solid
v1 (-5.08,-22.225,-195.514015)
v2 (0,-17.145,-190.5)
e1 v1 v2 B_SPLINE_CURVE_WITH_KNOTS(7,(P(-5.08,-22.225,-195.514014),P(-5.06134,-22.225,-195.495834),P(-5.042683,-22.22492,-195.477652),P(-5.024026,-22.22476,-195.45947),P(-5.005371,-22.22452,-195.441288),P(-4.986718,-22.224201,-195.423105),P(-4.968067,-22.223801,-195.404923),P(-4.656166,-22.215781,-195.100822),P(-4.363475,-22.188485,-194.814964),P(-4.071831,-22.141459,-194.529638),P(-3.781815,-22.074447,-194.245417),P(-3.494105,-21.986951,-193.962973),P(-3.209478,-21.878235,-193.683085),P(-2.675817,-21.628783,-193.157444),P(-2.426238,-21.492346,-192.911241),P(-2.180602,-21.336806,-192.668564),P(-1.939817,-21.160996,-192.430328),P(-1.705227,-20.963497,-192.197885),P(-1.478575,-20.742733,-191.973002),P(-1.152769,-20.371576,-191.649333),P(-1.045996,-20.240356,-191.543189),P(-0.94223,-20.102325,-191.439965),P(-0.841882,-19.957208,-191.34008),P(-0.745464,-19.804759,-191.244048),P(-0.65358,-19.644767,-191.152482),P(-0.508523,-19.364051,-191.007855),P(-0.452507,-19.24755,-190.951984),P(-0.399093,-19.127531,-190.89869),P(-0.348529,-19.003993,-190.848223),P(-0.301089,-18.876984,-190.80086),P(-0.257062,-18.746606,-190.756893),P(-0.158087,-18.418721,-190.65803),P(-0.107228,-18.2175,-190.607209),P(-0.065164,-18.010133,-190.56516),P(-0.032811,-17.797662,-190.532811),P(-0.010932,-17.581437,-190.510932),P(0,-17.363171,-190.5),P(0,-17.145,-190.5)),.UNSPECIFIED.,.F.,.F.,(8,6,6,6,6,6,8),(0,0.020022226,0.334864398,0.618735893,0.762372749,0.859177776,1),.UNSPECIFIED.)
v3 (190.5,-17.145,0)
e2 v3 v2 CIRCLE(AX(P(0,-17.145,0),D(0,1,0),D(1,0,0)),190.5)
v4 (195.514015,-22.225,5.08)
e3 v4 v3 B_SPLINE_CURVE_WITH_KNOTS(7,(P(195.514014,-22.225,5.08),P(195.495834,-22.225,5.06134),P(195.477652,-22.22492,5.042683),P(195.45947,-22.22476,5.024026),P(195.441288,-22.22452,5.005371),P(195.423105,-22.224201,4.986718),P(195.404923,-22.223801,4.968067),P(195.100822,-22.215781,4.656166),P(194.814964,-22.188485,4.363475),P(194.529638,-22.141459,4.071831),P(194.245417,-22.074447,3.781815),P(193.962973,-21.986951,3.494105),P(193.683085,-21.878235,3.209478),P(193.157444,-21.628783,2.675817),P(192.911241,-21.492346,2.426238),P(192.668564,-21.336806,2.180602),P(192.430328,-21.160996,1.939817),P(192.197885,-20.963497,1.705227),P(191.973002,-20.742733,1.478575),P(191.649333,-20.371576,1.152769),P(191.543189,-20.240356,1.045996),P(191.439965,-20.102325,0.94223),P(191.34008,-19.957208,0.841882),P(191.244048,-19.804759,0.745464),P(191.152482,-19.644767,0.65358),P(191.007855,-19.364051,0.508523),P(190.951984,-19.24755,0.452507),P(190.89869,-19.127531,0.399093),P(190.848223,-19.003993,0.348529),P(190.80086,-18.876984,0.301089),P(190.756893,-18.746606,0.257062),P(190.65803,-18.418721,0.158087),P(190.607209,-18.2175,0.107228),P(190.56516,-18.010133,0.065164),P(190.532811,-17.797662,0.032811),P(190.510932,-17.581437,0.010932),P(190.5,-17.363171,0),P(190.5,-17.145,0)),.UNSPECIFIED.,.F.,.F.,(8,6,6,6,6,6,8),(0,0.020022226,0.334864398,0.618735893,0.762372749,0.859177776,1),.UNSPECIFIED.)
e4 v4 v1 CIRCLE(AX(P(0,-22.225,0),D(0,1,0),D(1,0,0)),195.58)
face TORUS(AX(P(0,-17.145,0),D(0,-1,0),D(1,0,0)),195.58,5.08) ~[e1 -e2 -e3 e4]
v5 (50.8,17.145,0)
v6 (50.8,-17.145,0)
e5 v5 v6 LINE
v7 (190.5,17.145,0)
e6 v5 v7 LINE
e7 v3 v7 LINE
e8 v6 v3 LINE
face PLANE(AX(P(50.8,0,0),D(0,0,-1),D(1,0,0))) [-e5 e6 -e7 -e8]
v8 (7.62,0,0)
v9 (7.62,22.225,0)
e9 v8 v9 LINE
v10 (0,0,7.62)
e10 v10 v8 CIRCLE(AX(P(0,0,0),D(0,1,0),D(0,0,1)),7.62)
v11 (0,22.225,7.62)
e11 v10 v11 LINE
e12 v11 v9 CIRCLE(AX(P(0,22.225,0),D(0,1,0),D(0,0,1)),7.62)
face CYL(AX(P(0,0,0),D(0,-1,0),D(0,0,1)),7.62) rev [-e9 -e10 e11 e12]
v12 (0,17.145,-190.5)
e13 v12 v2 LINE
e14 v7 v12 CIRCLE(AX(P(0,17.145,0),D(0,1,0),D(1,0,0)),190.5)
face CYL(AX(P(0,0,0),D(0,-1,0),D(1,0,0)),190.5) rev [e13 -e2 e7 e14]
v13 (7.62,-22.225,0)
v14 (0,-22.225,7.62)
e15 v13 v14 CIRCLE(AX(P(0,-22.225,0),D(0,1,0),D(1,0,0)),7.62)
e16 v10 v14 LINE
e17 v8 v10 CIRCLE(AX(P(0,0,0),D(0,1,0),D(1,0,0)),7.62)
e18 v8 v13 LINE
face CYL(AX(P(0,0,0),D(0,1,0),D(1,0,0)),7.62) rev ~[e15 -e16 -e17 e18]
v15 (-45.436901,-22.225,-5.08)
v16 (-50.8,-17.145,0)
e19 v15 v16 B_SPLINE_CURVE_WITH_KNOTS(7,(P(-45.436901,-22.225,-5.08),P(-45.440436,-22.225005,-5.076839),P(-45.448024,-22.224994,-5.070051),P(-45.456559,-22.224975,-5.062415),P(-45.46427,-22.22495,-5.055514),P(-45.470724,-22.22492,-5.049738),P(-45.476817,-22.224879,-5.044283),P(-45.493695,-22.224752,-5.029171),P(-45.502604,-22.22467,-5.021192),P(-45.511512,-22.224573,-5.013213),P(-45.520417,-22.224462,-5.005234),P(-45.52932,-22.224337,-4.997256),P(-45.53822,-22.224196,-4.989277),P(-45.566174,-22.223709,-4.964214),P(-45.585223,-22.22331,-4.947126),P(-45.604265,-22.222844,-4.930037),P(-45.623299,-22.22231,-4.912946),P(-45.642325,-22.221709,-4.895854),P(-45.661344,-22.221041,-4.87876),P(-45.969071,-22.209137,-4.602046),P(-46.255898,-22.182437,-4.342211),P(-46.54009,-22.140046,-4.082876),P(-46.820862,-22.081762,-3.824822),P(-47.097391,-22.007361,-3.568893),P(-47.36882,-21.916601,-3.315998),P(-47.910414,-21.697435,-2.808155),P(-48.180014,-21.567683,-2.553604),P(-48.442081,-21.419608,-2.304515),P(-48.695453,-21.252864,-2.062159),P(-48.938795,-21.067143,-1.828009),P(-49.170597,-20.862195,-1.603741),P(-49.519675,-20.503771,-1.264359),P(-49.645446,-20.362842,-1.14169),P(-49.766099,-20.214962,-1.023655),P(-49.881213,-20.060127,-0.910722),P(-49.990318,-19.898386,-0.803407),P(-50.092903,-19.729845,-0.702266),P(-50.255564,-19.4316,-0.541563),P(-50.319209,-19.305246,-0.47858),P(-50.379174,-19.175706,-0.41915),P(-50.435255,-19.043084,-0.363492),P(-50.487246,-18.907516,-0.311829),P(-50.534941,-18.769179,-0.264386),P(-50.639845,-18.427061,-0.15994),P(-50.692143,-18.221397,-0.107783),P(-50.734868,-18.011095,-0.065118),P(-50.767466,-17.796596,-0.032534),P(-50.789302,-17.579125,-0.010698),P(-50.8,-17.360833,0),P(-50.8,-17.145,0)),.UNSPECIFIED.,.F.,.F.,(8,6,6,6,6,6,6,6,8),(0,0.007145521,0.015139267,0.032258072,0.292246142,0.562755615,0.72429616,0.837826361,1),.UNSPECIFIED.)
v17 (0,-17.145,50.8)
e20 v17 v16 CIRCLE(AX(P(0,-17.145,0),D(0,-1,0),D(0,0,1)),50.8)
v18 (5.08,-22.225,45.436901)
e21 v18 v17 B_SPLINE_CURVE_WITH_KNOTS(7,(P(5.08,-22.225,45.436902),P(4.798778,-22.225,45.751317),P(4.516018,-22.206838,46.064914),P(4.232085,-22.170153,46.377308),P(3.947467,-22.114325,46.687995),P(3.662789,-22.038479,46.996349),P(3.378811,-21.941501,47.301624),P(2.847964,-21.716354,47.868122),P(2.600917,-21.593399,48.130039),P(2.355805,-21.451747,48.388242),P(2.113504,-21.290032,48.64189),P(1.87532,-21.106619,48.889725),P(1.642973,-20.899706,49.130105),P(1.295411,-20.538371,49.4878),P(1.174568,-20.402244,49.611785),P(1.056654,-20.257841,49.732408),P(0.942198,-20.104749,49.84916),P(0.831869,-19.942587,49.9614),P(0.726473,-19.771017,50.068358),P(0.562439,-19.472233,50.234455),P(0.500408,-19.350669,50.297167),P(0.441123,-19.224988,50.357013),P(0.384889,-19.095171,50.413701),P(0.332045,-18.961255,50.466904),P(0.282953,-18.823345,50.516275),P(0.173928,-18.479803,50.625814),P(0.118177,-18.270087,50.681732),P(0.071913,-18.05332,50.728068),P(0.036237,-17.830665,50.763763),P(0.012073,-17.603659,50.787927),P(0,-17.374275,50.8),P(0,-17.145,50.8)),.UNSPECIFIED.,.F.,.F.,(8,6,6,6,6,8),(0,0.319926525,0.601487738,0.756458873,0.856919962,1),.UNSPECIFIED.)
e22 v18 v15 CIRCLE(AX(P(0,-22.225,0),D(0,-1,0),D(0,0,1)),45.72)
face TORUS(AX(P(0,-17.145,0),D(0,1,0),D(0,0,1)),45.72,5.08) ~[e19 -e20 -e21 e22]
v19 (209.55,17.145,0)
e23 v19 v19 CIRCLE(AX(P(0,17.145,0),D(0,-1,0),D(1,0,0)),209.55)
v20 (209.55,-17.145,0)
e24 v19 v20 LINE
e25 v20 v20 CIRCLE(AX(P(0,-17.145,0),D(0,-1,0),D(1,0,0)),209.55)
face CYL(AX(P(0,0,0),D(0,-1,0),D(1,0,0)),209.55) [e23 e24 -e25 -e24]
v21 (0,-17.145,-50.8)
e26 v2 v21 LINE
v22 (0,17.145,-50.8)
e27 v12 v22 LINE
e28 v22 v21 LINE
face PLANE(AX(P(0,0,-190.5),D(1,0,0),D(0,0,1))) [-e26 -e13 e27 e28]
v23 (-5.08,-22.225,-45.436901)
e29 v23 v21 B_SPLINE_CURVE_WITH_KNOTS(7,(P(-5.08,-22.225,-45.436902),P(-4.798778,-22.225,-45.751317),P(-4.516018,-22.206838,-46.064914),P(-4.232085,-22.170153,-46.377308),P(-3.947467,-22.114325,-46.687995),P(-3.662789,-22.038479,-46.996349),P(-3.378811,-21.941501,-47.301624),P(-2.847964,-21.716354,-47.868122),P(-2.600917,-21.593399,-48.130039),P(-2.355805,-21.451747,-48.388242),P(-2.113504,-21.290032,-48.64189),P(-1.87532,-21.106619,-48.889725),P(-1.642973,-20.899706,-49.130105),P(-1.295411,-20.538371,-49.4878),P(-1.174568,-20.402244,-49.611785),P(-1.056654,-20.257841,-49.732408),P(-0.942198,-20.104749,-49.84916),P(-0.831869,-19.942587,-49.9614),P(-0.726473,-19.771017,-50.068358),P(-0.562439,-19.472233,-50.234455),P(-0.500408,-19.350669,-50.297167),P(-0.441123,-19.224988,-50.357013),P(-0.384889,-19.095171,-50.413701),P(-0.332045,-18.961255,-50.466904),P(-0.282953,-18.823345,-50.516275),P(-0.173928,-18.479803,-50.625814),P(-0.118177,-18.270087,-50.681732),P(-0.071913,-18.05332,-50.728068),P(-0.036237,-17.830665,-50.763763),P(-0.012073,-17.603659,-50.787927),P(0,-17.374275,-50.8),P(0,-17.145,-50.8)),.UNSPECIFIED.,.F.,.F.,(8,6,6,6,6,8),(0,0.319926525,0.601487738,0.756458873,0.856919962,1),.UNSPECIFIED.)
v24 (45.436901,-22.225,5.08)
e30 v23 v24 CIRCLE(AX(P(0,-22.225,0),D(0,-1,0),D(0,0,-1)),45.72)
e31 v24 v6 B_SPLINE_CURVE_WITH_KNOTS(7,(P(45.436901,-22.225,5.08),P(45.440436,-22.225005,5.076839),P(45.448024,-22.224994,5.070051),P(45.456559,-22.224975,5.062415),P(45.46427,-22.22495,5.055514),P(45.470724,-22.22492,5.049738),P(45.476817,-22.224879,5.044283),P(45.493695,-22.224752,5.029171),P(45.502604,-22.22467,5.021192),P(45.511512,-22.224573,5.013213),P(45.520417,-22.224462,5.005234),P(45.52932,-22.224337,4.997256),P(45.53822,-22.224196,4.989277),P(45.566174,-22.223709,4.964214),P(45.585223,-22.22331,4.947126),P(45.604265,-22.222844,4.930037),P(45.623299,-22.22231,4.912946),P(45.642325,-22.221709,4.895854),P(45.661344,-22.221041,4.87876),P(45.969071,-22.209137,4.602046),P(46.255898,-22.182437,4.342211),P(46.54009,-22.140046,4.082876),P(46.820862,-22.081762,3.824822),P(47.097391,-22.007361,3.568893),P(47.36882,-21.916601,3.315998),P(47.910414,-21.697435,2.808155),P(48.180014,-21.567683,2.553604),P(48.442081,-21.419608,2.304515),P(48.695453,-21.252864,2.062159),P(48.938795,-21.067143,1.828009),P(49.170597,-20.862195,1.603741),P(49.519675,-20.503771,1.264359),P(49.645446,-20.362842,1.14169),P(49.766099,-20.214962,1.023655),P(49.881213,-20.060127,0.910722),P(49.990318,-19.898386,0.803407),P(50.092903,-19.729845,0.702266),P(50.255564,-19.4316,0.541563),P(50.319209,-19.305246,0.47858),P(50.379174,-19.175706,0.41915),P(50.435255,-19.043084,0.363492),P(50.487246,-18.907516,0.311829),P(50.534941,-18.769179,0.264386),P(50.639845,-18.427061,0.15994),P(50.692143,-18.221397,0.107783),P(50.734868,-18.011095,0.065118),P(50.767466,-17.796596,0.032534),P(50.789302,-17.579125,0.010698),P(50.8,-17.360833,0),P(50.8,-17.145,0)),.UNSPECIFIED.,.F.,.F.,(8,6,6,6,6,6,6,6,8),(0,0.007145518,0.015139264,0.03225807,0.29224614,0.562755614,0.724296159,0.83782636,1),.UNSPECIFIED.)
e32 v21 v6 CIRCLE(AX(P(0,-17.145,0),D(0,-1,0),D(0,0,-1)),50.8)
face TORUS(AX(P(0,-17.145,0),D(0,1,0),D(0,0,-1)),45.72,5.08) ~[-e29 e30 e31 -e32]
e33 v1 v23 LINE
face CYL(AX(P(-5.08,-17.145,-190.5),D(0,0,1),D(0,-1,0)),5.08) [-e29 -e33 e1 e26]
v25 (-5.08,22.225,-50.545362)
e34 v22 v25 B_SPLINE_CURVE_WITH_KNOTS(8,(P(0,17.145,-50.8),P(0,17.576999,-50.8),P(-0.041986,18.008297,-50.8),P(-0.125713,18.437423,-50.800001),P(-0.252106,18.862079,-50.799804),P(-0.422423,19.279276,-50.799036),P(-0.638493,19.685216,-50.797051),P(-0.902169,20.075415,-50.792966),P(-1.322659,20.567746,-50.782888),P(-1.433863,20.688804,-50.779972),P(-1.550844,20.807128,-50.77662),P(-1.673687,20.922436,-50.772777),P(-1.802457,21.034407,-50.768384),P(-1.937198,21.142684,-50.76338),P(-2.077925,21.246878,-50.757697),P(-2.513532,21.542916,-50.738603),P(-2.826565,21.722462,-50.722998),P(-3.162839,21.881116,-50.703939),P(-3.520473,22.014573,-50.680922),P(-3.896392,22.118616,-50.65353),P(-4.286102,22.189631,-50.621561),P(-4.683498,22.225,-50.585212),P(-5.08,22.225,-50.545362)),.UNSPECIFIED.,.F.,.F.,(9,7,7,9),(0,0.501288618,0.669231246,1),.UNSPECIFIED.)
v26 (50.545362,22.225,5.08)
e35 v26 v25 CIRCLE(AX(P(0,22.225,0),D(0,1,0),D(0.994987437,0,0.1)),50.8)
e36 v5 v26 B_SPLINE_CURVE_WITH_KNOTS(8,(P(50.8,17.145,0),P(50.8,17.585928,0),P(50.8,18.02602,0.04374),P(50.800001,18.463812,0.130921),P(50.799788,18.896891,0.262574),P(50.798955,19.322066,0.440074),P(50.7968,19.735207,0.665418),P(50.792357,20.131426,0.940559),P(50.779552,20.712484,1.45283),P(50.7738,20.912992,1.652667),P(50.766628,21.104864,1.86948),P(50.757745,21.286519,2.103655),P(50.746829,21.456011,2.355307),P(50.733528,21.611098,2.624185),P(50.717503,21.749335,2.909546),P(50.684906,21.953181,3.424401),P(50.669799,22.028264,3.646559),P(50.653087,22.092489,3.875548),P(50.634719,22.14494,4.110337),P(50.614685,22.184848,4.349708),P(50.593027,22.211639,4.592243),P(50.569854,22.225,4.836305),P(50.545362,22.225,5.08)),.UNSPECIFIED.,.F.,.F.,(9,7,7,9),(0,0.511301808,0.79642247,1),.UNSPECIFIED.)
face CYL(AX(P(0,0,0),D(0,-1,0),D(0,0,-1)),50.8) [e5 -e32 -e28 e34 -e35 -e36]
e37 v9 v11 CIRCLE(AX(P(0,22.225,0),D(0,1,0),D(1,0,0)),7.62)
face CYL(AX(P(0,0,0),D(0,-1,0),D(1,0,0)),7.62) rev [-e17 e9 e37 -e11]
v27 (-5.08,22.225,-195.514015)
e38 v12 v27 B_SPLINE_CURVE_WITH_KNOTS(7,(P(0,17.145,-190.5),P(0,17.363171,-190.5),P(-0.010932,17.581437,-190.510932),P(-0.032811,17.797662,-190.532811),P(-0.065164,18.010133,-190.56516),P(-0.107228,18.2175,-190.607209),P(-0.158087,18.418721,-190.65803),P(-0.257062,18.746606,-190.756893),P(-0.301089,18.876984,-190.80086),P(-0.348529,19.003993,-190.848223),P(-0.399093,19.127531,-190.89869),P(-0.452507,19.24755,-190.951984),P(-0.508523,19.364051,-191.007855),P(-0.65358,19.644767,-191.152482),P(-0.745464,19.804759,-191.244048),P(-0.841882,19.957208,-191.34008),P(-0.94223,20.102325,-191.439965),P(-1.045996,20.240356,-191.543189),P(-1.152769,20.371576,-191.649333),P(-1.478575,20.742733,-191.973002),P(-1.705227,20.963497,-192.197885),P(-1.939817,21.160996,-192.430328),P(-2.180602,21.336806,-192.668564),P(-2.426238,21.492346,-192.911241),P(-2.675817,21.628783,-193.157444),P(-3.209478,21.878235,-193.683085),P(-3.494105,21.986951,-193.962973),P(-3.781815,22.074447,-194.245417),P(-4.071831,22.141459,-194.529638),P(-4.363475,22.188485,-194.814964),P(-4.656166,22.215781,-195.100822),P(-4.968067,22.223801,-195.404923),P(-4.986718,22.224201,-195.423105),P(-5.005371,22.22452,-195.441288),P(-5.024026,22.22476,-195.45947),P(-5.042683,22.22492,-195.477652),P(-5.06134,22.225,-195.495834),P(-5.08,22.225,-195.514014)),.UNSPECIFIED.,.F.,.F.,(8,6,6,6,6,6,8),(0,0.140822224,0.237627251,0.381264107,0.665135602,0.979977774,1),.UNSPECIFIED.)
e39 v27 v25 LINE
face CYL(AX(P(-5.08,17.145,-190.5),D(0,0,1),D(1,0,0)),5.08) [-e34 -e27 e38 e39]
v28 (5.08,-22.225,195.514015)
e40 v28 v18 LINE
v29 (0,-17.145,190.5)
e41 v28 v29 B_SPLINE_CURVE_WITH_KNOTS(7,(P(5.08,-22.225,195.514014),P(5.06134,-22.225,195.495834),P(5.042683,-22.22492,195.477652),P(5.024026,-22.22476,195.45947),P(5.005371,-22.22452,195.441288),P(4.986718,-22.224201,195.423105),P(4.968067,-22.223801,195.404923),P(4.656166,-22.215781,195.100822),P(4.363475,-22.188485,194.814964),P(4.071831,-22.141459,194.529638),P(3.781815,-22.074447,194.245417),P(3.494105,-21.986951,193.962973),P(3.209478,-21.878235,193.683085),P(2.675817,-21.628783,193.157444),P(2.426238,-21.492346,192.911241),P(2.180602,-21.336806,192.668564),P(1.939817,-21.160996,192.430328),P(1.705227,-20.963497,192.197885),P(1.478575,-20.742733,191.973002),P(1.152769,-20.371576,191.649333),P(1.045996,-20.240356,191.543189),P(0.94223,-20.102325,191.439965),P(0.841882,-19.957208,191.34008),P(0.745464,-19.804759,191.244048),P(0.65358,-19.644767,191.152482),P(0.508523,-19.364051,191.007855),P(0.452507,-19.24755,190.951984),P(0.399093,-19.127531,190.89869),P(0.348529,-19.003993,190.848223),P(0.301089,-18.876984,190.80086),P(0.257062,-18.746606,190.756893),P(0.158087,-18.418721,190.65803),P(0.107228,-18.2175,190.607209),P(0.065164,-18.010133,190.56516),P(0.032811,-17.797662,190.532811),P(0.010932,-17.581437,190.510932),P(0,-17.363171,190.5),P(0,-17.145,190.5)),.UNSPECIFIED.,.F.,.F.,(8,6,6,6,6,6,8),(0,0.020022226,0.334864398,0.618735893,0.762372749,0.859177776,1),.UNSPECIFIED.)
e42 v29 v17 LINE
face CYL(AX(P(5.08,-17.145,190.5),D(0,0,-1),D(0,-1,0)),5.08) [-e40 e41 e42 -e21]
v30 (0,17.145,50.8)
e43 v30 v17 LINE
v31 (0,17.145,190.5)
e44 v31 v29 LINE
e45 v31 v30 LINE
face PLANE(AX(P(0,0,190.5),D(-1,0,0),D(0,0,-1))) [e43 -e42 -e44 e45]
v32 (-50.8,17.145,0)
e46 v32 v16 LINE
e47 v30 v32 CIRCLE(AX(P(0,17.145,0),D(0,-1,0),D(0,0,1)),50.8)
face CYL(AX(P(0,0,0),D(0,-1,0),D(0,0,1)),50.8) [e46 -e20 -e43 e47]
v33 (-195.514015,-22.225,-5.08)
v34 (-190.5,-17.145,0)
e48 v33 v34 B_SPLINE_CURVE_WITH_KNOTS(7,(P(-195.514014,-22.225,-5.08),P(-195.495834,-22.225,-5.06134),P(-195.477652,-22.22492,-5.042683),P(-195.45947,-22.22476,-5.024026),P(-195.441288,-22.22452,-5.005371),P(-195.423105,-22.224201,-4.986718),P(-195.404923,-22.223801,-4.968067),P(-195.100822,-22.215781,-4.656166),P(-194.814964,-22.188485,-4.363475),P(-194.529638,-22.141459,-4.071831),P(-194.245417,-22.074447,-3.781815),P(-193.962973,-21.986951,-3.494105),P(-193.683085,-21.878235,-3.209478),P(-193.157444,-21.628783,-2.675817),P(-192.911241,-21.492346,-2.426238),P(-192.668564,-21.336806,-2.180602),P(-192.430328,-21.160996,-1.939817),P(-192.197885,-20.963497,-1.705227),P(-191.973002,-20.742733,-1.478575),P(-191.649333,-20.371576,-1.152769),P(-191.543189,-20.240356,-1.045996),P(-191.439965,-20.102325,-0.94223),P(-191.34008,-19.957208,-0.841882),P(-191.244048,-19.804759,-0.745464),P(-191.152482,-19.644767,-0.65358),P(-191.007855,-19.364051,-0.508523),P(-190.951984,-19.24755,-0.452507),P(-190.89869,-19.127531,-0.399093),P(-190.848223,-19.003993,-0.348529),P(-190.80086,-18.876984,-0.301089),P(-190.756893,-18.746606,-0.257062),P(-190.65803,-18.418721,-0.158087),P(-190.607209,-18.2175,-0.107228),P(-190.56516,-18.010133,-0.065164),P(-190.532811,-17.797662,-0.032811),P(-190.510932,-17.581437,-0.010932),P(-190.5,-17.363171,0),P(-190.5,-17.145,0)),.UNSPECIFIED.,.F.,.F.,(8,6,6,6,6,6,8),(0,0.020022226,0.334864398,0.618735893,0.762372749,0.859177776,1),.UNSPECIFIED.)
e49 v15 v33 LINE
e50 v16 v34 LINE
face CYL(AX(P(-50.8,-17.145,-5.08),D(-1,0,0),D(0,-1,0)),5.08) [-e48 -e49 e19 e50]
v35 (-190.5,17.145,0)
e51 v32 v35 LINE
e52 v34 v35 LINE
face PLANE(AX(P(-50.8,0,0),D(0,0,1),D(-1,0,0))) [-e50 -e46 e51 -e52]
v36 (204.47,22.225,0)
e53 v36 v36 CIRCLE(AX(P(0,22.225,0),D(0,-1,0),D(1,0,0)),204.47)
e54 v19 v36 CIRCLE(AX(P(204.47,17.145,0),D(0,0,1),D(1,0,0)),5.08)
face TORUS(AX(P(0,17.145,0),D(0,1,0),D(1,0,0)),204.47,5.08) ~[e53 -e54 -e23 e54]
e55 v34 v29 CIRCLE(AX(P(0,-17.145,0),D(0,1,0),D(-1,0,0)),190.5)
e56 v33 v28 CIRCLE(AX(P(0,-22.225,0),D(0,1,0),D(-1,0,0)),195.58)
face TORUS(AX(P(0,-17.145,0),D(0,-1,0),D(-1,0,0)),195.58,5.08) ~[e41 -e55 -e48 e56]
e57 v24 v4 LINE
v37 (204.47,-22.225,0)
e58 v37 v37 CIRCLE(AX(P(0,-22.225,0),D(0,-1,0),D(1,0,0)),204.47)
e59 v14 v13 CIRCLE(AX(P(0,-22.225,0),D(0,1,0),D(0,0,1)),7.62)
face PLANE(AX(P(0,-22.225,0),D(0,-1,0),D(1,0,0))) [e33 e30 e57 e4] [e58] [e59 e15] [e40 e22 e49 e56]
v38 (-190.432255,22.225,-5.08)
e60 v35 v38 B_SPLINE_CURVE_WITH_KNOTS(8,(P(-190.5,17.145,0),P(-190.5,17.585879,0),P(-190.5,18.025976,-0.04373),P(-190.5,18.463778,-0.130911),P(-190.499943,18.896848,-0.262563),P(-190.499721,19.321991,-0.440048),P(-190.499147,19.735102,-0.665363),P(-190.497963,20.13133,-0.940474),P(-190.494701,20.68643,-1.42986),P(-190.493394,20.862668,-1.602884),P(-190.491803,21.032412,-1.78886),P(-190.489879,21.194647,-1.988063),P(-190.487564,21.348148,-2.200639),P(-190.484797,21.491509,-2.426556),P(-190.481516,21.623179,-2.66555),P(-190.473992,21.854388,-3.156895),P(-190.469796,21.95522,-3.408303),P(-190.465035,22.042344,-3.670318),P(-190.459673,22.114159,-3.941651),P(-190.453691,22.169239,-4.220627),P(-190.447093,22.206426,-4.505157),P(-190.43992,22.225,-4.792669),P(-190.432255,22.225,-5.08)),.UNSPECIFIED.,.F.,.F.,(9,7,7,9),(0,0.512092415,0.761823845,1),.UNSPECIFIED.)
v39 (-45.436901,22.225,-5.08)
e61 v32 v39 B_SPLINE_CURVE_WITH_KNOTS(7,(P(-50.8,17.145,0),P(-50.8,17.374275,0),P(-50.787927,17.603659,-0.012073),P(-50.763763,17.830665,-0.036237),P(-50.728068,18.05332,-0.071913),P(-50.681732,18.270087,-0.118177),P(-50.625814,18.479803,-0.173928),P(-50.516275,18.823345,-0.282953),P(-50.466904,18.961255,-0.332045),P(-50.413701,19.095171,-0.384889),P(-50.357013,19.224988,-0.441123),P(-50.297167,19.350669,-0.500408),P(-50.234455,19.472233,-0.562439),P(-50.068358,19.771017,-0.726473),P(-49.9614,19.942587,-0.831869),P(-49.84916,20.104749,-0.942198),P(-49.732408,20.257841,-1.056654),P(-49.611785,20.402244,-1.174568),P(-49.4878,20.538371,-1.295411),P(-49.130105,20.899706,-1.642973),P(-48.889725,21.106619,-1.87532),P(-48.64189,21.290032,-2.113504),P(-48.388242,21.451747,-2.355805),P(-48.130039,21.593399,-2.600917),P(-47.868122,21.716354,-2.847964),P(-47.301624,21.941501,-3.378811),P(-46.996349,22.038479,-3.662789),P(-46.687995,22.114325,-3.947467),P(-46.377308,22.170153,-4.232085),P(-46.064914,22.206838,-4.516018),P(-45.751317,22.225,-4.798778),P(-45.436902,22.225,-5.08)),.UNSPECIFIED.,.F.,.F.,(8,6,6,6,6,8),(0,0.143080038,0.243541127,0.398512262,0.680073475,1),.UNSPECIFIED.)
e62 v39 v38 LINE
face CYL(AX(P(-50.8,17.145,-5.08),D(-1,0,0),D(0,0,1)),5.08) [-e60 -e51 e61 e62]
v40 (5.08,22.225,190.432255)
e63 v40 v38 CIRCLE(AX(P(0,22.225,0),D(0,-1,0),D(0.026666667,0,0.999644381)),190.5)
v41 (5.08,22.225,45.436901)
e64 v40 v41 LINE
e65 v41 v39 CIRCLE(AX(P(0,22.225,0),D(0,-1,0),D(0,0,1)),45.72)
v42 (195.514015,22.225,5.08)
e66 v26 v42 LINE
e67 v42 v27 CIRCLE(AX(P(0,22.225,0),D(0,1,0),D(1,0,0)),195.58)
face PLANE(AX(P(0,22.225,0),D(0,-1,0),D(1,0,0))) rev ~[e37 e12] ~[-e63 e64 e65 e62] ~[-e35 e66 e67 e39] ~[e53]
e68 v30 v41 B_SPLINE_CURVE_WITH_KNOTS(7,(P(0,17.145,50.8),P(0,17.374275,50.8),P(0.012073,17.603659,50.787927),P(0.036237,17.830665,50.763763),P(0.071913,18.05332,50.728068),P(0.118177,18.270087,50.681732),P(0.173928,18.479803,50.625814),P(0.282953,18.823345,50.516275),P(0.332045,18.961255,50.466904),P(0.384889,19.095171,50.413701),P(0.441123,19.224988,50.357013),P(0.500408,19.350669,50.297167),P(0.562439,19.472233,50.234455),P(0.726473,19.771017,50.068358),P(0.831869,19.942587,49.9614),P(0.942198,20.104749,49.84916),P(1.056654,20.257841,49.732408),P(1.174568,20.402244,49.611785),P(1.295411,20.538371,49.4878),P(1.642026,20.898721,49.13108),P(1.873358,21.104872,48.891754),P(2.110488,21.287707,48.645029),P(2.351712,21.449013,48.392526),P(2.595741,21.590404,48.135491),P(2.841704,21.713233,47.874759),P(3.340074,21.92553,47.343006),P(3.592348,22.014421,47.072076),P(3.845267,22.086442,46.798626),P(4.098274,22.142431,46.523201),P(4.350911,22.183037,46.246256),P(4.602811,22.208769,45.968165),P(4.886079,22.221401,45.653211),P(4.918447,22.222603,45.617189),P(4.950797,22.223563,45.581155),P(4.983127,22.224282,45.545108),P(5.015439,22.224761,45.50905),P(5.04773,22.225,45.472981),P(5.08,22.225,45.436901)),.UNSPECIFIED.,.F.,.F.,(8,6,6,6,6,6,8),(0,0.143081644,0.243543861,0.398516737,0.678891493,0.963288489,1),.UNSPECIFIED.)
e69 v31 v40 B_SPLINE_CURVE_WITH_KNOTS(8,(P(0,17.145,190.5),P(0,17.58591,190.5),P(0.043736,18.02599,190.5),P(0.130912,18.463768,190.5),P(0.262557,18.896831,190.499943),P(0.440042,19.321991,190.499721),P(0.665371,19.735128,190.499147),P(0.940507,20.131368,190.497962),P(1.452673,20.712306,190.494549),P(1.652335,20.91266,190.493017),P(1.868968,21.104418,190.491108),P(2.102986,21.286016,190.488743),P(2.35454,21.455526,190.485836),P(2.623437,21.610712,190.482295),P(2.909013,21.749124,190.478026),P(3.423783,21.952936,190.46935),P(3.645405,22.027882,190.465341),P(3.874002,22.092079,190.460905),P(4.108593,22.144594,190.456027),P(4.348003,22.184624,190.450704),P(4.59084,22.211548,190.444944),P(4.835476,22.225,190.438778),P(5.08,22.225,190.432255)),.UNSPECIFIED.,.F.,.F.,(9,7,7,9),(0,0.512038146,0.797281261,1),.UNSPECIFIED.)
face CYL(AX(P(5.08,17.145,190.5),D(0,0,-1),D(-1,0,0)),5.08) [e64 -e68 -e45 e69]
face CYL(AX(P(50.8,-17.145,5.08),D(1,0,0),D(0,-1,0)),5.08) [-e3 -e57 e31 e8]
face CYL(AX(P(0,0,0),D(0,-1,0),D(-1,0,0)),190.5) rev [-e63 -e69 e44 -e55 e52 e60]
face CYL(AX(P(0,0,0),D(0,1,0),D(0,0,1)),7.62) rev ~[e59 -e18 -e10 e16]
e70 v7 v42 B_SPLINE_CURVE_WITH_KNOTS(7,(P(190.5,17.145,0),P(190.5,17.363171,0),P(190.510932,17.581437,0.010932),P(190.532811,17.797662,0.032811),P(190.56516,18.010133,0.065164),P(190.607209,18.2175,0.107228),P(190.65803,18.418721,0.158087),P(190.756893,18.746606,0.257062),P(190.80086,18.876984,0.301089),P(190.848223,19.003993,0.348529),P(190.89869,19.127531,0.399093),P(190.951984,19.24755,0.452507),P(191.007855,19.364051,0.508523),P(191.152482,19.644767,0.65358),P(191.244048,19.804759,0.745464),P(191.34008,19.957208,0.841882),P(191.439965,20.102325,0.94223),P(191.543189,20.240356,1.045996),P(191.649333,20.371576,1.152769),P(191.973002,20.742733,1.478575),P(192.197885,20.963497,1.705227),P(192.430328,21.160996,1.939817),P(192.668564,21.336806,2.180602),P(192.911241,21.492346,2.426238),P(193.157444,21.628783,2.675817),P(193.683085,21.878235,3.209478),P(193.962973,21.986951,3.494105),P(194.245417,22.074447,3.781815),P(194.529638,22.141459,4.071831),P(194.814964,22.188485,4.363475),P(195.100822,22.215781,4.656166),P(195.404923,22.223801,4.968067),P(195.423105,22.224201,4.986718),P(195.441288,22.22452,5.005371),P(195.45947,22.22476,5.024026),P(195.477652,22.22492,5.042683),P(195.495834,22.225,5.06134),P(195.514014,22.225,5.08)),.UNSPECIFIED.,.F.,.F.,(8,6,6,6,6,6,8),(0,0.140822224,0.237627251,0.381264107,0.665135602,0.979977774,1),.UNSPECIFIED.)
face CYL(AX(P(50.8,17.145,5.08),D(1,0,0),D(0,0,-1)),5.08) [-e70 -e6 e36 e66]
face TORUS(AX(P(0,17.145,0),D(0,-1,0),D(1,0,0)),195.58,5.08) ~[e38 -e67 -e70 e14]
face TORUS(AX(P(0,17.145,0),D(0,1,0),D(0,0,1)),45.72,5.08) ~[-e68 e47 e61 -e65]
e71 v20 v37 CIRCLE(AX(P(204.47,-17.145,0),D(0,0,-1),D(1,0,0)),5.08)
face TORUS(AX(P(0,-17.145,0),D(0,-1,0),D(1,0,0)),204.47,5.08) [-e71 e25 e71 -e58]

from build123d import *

# Parameters (mm, degrees)
F0_R     = 209.55
F1_DEPTH = 22.225
F3_R     = 5.08


# Not quite as in the source:
# - a feature of the source that left no trace in its solid (it failed there, or was rolled back) is left out


with BuildPart() as f1:
    # F0 (on Front) → F1 (new body, symmetric)
    with BuildSketch(Plane.XZ):
        Circle(F0_R)
        with BuildLine():
            ThreePointArc((0, 190.5), (134.703841816, 134.703841816), (190.5, 0))
            ThreePointArc((190.5, 0), (134.703841816, -134.703841816), (0, -190.5))
            ThreePointArc((0, -190.5), (-134.703841816, -134.703841816), (-190.5, 0))
            ThreePointArc((-190.5, 0), (-134.703841816, 134.703841816), (0, 190.5))
        make_face(mode=Mode.SUBTRACT)
        with BuildLine():
            ThreePointArc((0, -50.8), (35.9210244843, -35.9210244843), (50.8, 0))
            ThreePointArc((50.8, 0), (35.9210244843, 35.9210244843), (0, 50.8))
            ThreePointArc((0, 50.8), (-35.9210244843, 35.9210244843), (-50.8, 0))
            ThreePointArc((-50.8, 0), (-35.9210244843, -35.9210244843), (0, -50.8))
        make_face()
        with BuildLine():
            ThreePointArc((0, 7.62), (5.3881536726, 5.3881536726), (7.62, 0))
            ThreePointArc((7.62, 0), (-5.3881536726, -5.3881536726), (0, 7.62))
        make_face(mode=Mode.SUBTRACT)
        with BuildLine():
            Line((0, -190.5), (0, -50.8))
            ThreePointArc((0, -50.8), (-35.9210244843, -35.9210244843), (-50.8, 0))
            Line((-50.8, 0), (-190.5, 0))
            ThreePointArc((-190.5, 0), (-134.703841816, -134.703841816), (0, -190.5))
        make_face()
        with BuildLine():
            ThreePointArc((0, 50.8), (35.9210244843, 35.9210244843), (50.8, 0))
            Line((50.8, 0), (190.5, 0))
            ThreePointArc((190.5, 0), (134.703841816, 134.703841816), (0, 190.5))
            Line((0, 190.5), (0, 50.8))
        make_face()
    extrude(amount=F1_DEPTH, both=True)

    # F3
    f3_edges = [f1.edges().sort_by_distance(p)[0] for p in [
        (0, -22.225, -120.65),
        (0, 22.225, -120.65),
        (120.65, -22.225, 0),
        (-120.65, -22.225, 0),
        (0, -22.225, 120.65),
        (-209.55, 22.225, 0),
        (-209.55, -22.225, 0),
        (-134.703842, -22.225, 134.703842),
        (-35.921024, -22.225, 35.921024),
        (134.703842, -22.225, -134.703842),
        (35.921024, -22.225, -35.921024),
        (120.65, 22.225, 0),
        (134.703842, 22.225, -134.703842),
        (-120.65, 22.225, 0),
        (-35.921024, 22.225, 35.921024),
        (0, 22.225, 120.65),
    ]]
    fillet(f3_edges, radius=F3_R)


solid = f1.part
